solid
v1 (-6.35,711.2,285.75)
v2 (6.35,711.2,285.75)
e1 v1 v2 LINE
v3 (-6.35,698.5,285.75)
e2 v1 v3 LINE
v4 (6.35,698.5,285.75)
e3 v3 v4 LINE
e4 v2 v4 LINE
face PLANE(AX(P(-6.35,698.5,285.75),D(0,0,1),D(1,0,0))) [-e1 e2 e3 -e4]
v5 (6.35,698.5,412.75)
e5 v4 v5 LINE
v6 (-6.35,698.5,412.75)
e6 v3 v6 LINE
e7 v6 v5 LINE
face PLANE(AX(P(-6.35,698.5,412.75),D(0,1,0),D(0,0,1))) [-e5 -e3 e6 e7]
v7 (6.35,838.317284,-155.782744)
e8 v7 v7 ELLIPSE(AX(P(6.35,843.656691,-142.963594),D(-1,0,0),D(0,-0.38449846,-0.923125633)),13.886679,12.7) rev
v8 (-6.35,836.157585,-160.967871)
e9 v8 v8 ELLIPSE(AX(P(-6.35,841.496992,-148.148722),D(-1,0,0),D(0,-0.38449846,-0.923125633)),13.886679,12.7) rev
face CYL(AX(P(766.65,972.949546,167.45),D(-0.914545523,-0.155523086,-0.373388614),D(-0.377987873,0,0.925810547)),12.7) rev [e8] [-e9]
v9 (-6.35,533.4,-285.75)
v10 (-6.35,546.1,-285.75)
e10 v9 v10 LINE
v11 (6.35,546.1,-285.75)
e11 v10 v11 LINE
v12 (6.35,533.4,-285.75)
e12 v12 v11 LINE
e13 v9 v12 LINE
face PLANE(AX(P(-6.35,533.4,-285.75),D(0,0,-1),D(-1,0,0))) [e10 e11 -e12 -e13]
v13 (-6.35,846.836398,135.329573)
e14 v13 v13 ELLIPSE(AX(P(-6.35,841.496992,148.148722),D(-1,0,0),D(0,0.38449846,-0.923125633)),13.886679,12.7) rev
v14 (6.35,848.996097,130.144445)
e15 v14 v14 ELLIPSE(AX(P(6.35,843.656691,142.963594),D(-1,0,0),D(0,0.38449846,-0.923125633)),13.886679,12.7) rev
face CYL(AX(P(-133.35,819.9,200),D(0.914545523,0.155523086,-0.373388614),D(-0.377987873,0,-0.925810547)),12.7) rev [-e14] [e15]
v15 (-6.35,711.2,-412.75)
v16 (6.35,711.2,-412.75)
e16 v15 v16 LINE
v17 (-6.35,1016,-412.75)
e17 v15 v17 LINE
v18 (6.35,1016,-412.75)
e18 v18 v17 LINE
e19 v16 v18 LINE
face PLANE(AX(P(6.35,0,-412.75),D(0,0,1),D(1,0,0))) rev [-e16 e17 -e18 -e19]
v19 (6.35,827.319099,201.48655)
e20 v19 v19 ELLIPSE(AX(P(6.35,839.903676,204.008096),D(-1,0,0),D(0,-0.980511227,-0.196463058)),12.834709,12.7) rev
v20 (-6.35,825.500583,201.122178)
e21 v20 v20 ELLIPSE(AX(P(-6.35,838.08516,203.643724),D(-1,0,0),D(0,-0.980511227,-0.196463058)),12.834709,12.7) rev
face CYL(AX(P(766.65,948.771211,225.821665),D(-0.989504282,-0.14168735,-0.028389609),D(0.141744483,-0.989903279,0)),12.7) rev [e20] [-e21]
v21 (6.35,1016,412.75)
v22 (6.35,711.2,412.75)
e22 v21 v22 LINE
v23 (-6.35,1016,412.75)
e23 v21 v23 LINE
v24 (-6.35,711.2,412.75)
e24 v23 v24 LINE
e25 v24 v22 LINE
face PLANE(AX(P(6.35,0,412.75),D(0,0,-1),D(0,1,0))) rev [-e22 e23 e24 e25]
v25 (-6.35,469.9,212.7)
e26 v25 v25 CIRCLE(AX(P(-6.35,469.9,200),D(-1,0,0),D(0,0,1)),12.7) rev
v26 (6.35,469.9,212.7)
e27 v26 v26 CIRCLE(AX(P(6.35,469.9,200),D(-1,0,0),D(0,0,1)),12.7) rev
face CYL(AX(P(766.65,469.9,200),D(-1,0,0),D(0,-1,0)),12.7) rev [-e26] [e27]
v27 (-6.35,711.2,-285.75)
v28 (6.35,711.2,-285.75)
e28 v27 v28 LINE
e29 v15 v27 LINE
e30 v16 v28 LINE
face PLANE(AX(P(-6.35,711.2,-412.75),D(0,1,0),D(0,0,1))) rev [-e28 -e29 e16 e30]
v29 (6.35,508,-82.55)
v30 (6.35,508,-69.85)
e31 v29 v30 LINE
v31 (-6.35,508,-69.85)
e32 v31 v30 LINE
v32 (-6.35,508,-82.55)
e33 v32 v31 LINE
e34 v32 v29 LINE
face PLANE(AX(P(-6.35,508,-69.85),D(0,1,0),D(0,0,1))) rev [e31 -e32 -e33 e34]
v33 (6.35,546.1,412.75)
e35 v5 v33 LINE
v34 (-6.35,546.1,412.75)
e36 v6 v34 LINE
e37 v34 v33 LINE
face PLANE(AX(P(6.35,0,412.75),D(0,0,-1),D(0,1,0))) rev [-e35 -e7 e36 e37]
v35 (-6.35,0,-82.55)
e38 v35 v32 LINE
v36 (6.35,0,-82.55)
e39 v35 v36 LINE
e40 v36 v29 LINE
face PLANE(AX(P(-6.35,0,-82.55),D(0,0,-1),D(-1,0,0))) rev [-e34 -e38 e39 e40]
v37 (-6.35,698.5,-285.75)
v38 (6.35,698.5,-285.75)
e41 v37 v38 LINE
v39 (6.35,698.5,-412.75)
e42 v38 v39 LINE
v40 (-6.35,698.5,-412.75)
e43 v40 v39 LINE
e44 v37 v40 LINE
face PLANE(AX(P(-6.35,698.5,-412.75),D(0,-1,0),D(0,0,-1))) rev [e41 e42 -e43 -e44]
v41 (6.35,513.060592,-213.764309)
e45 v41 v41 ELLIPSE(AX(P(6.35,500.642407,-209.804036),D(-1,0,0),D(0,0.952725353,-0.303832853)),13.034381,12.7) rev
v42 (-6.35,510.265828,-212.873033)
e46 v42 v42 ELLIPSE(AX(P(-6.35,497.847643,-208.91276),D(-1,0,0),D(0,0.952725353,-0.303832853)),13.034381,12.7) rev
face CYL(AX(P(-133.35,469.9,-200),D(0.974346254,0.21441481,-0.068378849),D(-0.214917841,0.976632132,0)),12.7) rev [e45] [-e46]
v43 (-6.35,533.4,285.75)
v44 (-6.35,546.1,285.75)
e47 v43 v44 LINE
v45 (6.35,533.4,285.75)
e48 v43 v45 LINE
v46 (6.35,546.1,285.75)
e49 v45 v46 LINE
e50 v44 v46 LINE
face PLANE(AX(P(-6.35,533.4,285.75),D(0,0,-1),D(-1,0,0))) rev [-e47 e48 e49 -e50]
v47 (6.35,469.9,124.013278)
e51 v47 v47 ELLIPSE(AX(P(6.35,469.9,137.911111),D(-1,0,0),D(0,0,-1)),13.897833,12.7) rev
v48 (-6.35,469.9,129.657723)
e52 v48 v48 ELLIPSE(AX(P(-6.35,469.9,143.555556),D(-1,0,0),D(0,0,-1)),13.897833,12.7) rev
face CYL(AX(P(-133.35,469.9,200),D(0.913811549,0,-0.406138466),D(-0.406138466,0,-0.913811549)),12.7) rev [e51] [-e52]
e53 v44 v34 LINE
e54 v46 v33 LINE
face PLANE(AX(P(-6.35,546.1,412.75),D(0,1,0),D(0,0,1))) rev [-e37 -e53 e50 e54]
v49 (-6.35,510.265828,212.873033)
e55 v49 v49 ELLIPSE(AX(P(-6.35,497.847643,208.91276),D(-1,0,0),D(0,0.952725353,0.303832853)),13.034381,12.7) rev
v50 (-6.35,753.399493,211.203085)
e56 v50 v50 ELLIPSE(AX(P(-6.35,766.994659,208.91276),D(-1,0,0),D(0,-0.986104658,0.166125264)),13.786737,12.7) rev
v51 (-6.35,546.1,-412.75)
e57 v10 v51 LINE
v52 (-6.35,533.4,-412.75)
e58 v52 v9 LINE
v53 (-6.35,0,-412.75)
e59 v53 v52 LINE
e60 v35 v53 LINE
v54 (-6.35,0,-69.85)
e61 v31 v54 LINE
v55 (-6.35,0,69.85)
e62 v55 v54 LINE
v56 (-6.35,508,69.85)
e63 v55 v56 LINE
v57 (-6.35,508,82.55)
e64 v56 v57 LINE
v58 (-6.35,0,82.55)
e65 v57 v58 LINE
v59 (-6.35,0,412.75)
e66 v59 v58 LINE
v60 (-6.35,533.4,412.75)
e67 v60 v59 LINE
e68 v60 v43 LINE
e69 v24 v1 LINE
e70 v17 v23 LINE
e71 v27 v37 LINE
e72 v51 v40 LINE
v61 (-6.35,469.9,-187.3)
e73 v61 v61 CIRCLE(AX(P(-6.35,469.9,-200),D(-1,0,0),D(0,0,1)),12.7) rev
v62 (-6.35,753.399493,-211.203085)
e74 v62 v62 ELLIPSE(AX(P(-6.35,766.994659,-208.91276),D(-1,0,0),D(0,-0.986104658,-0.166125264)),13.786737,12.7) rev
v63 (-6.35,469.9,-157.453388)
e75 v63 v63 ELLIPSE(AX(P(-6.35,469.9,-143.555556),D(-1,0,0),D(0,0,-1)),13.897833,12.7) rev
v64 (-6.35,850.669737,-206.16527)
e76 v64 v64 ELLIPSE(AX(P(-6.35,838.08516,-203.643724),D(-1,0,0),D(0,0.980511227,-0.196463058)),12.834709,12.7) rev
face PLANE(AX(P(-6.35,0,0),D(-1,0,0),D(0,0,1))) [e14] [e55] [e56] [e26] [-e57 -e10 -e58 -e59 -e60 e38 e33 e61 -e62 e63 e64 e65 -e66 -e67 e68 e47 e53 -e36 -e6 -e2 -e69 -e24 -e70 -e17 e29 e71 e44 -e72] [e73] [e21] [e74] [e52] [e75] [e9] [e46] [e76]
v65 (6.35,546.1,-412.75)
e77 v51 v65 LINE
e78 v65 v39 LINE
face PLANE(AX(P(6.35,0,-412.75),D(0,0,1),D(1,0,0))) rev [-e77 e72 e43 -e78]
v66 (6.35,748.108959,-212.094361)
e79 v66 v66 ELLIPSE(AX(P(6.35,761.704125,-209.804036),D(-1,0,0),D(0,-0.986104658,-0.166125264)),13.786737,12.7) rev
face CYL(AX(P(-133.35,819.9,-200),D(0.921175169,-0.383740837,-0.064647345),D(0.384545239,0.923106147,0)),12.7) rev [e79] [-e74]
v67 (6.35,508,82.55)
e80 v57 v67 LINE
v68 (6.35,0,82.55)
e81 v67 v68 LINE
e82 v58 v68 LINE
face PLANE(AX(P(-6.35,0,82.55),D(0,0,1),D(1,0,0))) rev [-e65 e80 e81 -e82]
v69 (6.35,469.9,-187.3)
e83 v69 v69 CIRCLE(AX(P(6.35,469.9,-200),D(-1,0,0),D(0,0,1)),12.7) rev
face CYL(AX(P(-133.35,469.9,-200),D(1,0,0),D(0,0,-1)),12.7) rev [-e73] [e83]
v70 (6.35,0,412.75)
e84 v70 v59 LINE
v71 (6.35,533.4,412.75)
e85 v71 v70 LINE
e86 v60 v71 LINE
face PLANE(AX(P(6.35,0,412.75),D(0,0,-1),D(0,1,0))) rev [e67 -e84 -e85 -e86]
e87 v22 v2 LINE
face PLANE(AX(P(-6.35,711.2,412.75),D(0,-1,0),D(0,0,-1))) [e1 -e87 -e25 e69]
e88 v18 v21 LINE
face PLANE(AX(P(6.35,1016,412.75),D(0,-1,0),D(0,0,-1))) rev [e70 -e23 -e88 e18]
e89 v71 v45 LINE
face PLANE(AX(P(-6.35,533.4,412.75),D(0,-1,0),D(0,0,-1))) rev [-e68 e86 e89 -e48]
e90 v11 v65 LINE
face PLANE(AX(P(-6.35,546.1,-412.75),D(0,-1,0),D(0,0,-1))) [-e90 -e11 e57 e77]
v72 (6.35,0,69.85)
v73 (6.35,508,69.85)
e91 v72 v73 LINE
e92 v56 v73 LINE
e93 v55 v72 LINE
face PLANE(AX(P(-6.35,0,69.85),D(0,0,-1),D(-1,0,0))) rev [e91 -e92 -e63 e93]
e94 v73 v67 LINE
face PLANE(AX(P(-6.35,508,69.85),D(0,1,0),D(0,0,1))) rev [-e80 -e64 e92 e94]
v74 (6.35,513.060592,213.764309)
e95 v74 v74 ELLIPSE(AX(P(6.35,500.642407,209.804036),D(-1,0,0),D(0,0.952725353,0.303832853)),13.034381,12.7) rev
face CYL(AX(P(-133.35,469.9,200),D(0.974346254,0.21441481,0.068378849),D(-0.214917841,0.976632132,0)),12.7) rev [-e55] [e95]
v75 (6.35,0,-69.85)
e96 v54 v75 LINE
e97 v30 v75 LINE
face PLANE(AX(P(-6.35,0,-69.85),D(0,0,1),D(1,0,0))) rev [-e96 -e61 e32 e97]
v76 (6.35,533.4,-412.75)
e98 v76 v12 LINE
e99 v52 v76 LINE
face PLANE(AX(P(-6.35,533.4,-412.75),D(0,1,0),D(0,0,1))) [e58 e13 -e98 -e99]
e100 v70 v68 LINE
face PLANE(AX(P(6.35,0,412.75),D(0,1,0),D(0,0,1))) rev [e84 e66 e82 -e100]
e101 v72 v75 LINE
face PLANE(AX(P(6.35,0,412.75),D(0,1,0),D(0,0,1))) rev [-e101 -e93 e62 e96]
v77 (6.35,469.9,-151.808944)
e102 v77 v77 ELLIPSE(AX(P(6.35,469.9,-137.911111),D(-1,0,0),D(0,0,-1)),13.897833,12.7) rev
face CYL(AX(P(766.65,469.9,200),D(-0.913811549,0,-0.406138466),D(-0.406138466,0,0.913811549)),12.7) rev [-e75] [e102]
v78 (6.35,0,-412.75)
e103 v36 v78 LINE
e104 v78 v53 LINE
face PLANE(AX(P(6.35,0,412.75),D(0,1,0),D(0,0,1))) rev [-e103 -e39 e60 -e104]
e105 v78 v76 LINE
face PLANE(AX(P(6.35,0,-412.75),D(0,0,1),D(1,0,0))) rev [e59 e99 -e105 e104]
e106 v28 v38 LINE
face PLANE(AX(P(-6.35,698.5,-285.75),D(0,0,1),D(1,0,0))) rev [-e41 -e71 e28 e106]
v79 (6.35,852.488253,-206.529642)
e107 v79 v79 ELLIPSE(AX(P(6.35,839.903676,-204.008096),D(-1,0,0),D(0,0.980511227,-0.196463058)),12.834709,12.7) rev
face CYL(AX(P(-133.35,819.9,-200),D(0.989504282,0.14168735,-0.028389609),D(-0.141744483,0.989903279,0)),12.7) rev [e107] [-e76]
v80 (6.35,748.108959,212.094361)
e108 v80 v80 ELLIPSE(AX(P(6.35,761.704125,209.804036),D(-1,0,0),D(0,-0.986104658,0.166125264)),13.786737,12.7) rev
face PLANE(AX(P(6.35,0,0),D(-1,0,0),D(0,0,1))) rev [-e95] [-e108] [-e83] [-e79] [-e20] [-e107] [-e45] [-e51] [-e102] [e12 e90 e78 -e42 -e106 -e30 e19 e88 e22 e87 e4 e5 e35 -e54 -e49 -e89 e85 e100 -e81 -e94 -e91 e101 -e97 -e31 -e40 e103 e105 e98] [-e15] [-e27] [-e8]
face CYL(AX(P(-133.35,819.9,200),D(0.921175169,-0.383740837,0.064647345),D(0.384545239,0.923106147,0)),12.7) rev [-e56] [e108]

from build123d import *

# Parameters (mm, degrees)
SKETCH1_W               = 825.5
SKETCH1_H               = 1016
BOSS_EXTRUDE1_DEPTH     = 6.35
CAVITY1_START           = -69.750581005
CAVITY1_OUTLINE_R       = 12.7
CAVITY1_DEPTH           = 25.186721765
CAVITY1_2_OUTLINE_R     = 12.7
CAVITY1_2_DEPTH         = 25.186721765
CAVITY1_START_2         = 64.130873345
CAVITY1_3_OUTLINE_R     = 12.7
CAVITY1_3_DEPTH         = 25.120529807
CAVITY1_4_OUTLINE_R     = 12.7
CAVITY1_4_DEPTH         = 25.120529807
CAVITY1_START_3         = -292.036063147
CAVITY1_5_OUTLINE_R     = 12.7
CAVITY1_5_DEPTH         = 24.516904948
CAVITY1_6_OUTLINE_R     = 12.7
CAVITY1_6_DEPTH         = 24.516904948
CAVITY1_START_4         = 116.389417883
CAVITY1_7_OUTLINE_R     = 12.7
CAVITY1_7_DEPTH         = 16.544031778
CAVITY1_8_OUTLINE_R     = 12.7
CAVITY1_8_DEPTH         = 16.544031778
CAVITY1_START_5         = 111.910581246
CAVITY1_9_OUTLINE_R     = 12.7
CAVITY1_9_DEPTH         = 18.901264253
CAVITY1_START_6         = -6.35
CAVITY1_10_OUTLINE_R    = 12.7
CAVITY1_10_DEPTH        = 12.7
CAVITY1_11_OUTLINE_R    = 12.7
CAVITY1_11_DEPTH        = 18.901264253
CUT_EXTRUDE4_DEPTH      = 1097.658052904
CUT_EXTRUDE4_DEPTH_BACK = 1097.658052904
SKETCH5_W               = 12.7
SKETCH5_H               = 508
CUT_EXTRUDE5_DEPTH      = 1097.658052904
CUT_EXTRUDE5_DEPTH_BACK = 1097.658052904
SKETCH6_W               = 12.7
SKETCH6_H               = 508
SKETCH7_W               = 127
SKETCH7_H               = 12.7
CUT_EXTRUDE6_DEPTH      = 1097.658052904
SKETCH8_W               = 127
SKETCH8_H               = 12.7
CUT_EXTRUDE7_DEPTH      = 1097.658052904


# Read off the part's stored shape, not the designer's step: Cavity1
with BuildPart() as part:
    # Sketch1 → Boss-Extrude1 (new, symmetric)
    with BuildSketch(Plane(origin=(0, 0, 0), x_dir=(0, 0, -1), z_dir=(1, 0, 0))):
        with Locations((0, 508)):
            Rectangle(SKETCH1_W, SKETCH1_H)
    extrude(amount=BOSS_EXTRUDE1_DEPTH, both=True)

    # Cavity1 outline → Cavity1 (cut)
    with BuildSketch(Plane(origin=(0, 0, 0), x_dir=(0, 1, 0), z_dir=(0.9138115486202553, 0, 0.4061384660534521)).offset(CAVITY1_START)):
        with Locations((469.9, -128.603745276)):
            Circle(CAVITY1_OUTLINE_R)
    extrude(amount=CAVITY1_DEPTH, mode=Mode.SUBTRACT)

    # Cavity1 2 outline → Cavity1 2 (cut)
    with BuildSketch(Plane(origin=(0, 0, 0), x_dir=(0, 1, 0), z_dir=(0.913811548620257, 0, -0.406138466053448)).offset(CAVITY1_START)):
        with Locations((469.9, 128.603745276)):
            Circle(CAVITY1_2_OUTLINE_R)
    extrude(amount=CAVITY1_2_DEPTH, mode=Mode.SUBTRACT)

    # Cavity1 3 outline → Cavity1 3 (cut)
    with BuildSketch(Plane(origin=(0, 0, 0), x_dir=(-0.14398491314217557, 0.9878322579058099, -0.05878584037121407), z_dir=(0.9145455226247352, 0.15552308587701602, 0.37338861365384507)).offset(CAVITY1_START_2)):
        with Locations((840.881224499, -134.757426505)):
            Circle(CAVITY1_3_OUTLINE_R)
    extrude(amount=CAVITY1_3_DEPTH, mode=Mode.SUBTRACT)

    # Cavity1 4 outline → Cavity1 4 (cut)
    with BuildSketch(Plane(origin=(0, 0, 0), x_dir=(-0.14398491314217668, 0.9878322579058096, 0.05878584037121399), z_dir=(0.9145455226247362, 0.15552308587701702, -0.37338861365384207)).offset(CAVITY1_START_2)):
        with Locations((840.881224499, 134.757426505)):
            Circle(CAVITY1_4_OUTLINE_R)
    extrude(amount=CAVITY1_4_DEPTH, mode=Mode.SUBTRACT)

    # Cavity1 5 outline → Cavity1 5 (cut)
    with BuildSketch(Plane(origin=(0, 0, 0), x_dir=(0.3827993278239342, 0.9234408320803411, 0.026864554050110373), z_dir=(0.9211751685610859, -0.38374083656390695, 0.0646473447226402)).offset(CAVITY1_START_3)):
        with Locations((711.455758667, 208.844736372)):
            Circle(CAVITY1_5_OUTLINE_R)
    extrude(amount=CAVITY1_5_DEPTH, mode=Mode.SUBTRACT)

    # Cavity1 6 outline → Cavity1 6 (cut)
    with BuildSketch(Plane(origin=(0, 0, 0), x_dir=(0.3827993278239134, 0.9234408320803503, -0.02686455405009277), z_dir=(0.9211751685610978, -0.3837408365638849, -0.06464734472260218)).offset(CAVITY1_START_3)):
        with Locations((711.455758667, -208.844736372)):
            Circle(CAVITY1_6_OUTLINE_R)
    extrude(amount=CAVITY1_6_DEPTH, mode=Mode.SUBTRACT)

    # Cavity1 7 outline → Cavity1 7 (cut)
    with BuildSketch(Plane(origin=(0, 0, 0), x_dir=(-0.14162907065889588, 0.989911458049715, -0.00406344265182396), z_dir=(0.9895042824022925, 0.14168735025360304, 0.028389608761606212)).offset(CAVITY1_START_4)):
        with Locations((829.701952497, 203.742071242)):
            Circle(CAVITY1_7_OUTLINE_R)
    extrude(amount=CAVITY1_7_DEPTH, mode=Mode.SUBTRACT)

    # Cavity1 8 outline → Cavity1 8 (cut)
    with BuildSketch(Plane(origin=(0, 0, 0), x_dir=(-0.1416290706588989, 0.9899114580497147, 0.00406344265182273), z_dir=(0.9895042824022923, 0.14168735025360601, -0.028389608761597008)).offset(CAVITY1_START_4)):
        with Locations((829.701952497, -203.742071242)):
            Circle(CAVITY1_8_OUTLINE_R)
    extrude(amount=CAVITY1_8_DEPTH, mode=Mode.SUBTRACT)

    # Cavity1 9 outline → Cavity1 9 (cut)
    with BuildSketch(Plane(origin=(0, 0, 0), x_dir=(-0.2138887427613121, 0.9767426935099688, 0.015010542790871387), z_dir=(0.9743462537907107, 0.21441480983106392, -0.06837884942814358)).offset(CAVITY1_START_5)):
        with Locations((484.491346969, -208.844736372)):
            Circle(CAVITY1_9_OUTLINE_R)
    extrude(amount=CAVITY1_9_DEPTH, mode=Mode.SUBTRACT)

    # Cavity1 10 outline → Cavity1 10 (cut)
    with BuildSketch(Plane.YZ.offset(CAVITY1_START_6)):
        with Locations((469.9, -200)):
            Circle(CAVITY1_10_OUTLINE_R)
        with Locations((469.9, 200)):
            Circle(CAVITY1_10_OUTLINE_R)
    extrude(amount=CAVITY1_10_DEPTH, mode=Mode.SUBTRACT)

    # Cavity1 11 outline → Cavity1 11 (cut)
    with BuildSketch(Plane(origin=(0, 0, 0), x_dir=(-0.21388874276128378, 0.9767426935099748, -0.015010542790877034), z_dir=(0.9743462537907144, 0.21441480983103609, 0.06837884942817862)).offset(CAVITY1_START_5)):
        with Locations((484.491346969, 208.844736372)):
            Circle(CAVITY1_11_OUTLINE_R)
    extrude(amount=CAVITY1_11_DEPTH, mode=Mode.SUBTRACT)

    # Sketch5 → Cut-Extrude4 (cut, two sides: drawn at the far end of the back side and taken through both)
    with BuildSketch(Plane(origin=(0, 0, 0), x_dir=(0, 0, -1), z_dir=(1, 0, 0)).offset(-CUT_EXTRUDE4_DEPTH_BACK)):
        with Locations((76.2, 254)):
            Rectangle(SKETCH5_W, SKETCH5_H)
    extrude(amount=CUT_EXTRUDE4_DEPTH + CUT_EXTRUDE4_DEPTH_BACK, mode=Mode.SUBTRACT)

    # Sketch6 → Cut-Extrude5 (cut, two sides: drawn at the far end of the back side and taken through both)
    with BuildSketch(Plane(origin=(0, 0, 0), x_dir=(0, 0, -1), z_dir=(1, 0, 0)).offset(-CUT_EXTRUDE5_DEPTH_BACK)):
        with Locations((-76.2, 254)):
            Rectangle(SKETCH6_W, SKETCH6_H)
    extrude(amount=CUT_EXTRUDE5_DEPTH + CUT_EXTRUDE5_DEPTH_BACK, mode=Mode.SUBTRACT)

    # Sketch7 → Cut-Extrude6 (cut, symmetric)
    with BuildSketch(Plane(origin=(0, 0, 0), x_dir=(0, 0, -1), z_dir=(1, 0, 0))):
        with Locations((349.25, 704.85)):
            Rectangle(SKETCH7_W, SKETCH7_H)
    cut_extrude6 = extrude(amount=CUT_EXTRUDE6_DEPTH, both=True, mode=Mode.SUBTRACT)

    # Sketch8 → Cut-Extrude7 (cut, symmetric)
    with BuildSketch(Plane(origin=(0, 0, 0), x_dir=(0, 0, -1), z_dir=(1, 0, 0))):
        with Locations((-349.25, 539.75)):
            Rectangle(SKETCH8_W, SKETCH8_H)
    cut_extrude7 = extrude(amount=CUT_EXTRUDE7_DEPTH, both=True, mode=Mode.SUBTRACT)

    # Mirror1: Cut-Extrude6, Cut-Extrude7 across plane
    add(cut_extrude6.mirror(Plane.XY), mode=Mode.SUBTRACT)
    add(cut_extrude7.mirror(Plane.XY), mode=Mode.SUBTRACT)


solid = part.part
